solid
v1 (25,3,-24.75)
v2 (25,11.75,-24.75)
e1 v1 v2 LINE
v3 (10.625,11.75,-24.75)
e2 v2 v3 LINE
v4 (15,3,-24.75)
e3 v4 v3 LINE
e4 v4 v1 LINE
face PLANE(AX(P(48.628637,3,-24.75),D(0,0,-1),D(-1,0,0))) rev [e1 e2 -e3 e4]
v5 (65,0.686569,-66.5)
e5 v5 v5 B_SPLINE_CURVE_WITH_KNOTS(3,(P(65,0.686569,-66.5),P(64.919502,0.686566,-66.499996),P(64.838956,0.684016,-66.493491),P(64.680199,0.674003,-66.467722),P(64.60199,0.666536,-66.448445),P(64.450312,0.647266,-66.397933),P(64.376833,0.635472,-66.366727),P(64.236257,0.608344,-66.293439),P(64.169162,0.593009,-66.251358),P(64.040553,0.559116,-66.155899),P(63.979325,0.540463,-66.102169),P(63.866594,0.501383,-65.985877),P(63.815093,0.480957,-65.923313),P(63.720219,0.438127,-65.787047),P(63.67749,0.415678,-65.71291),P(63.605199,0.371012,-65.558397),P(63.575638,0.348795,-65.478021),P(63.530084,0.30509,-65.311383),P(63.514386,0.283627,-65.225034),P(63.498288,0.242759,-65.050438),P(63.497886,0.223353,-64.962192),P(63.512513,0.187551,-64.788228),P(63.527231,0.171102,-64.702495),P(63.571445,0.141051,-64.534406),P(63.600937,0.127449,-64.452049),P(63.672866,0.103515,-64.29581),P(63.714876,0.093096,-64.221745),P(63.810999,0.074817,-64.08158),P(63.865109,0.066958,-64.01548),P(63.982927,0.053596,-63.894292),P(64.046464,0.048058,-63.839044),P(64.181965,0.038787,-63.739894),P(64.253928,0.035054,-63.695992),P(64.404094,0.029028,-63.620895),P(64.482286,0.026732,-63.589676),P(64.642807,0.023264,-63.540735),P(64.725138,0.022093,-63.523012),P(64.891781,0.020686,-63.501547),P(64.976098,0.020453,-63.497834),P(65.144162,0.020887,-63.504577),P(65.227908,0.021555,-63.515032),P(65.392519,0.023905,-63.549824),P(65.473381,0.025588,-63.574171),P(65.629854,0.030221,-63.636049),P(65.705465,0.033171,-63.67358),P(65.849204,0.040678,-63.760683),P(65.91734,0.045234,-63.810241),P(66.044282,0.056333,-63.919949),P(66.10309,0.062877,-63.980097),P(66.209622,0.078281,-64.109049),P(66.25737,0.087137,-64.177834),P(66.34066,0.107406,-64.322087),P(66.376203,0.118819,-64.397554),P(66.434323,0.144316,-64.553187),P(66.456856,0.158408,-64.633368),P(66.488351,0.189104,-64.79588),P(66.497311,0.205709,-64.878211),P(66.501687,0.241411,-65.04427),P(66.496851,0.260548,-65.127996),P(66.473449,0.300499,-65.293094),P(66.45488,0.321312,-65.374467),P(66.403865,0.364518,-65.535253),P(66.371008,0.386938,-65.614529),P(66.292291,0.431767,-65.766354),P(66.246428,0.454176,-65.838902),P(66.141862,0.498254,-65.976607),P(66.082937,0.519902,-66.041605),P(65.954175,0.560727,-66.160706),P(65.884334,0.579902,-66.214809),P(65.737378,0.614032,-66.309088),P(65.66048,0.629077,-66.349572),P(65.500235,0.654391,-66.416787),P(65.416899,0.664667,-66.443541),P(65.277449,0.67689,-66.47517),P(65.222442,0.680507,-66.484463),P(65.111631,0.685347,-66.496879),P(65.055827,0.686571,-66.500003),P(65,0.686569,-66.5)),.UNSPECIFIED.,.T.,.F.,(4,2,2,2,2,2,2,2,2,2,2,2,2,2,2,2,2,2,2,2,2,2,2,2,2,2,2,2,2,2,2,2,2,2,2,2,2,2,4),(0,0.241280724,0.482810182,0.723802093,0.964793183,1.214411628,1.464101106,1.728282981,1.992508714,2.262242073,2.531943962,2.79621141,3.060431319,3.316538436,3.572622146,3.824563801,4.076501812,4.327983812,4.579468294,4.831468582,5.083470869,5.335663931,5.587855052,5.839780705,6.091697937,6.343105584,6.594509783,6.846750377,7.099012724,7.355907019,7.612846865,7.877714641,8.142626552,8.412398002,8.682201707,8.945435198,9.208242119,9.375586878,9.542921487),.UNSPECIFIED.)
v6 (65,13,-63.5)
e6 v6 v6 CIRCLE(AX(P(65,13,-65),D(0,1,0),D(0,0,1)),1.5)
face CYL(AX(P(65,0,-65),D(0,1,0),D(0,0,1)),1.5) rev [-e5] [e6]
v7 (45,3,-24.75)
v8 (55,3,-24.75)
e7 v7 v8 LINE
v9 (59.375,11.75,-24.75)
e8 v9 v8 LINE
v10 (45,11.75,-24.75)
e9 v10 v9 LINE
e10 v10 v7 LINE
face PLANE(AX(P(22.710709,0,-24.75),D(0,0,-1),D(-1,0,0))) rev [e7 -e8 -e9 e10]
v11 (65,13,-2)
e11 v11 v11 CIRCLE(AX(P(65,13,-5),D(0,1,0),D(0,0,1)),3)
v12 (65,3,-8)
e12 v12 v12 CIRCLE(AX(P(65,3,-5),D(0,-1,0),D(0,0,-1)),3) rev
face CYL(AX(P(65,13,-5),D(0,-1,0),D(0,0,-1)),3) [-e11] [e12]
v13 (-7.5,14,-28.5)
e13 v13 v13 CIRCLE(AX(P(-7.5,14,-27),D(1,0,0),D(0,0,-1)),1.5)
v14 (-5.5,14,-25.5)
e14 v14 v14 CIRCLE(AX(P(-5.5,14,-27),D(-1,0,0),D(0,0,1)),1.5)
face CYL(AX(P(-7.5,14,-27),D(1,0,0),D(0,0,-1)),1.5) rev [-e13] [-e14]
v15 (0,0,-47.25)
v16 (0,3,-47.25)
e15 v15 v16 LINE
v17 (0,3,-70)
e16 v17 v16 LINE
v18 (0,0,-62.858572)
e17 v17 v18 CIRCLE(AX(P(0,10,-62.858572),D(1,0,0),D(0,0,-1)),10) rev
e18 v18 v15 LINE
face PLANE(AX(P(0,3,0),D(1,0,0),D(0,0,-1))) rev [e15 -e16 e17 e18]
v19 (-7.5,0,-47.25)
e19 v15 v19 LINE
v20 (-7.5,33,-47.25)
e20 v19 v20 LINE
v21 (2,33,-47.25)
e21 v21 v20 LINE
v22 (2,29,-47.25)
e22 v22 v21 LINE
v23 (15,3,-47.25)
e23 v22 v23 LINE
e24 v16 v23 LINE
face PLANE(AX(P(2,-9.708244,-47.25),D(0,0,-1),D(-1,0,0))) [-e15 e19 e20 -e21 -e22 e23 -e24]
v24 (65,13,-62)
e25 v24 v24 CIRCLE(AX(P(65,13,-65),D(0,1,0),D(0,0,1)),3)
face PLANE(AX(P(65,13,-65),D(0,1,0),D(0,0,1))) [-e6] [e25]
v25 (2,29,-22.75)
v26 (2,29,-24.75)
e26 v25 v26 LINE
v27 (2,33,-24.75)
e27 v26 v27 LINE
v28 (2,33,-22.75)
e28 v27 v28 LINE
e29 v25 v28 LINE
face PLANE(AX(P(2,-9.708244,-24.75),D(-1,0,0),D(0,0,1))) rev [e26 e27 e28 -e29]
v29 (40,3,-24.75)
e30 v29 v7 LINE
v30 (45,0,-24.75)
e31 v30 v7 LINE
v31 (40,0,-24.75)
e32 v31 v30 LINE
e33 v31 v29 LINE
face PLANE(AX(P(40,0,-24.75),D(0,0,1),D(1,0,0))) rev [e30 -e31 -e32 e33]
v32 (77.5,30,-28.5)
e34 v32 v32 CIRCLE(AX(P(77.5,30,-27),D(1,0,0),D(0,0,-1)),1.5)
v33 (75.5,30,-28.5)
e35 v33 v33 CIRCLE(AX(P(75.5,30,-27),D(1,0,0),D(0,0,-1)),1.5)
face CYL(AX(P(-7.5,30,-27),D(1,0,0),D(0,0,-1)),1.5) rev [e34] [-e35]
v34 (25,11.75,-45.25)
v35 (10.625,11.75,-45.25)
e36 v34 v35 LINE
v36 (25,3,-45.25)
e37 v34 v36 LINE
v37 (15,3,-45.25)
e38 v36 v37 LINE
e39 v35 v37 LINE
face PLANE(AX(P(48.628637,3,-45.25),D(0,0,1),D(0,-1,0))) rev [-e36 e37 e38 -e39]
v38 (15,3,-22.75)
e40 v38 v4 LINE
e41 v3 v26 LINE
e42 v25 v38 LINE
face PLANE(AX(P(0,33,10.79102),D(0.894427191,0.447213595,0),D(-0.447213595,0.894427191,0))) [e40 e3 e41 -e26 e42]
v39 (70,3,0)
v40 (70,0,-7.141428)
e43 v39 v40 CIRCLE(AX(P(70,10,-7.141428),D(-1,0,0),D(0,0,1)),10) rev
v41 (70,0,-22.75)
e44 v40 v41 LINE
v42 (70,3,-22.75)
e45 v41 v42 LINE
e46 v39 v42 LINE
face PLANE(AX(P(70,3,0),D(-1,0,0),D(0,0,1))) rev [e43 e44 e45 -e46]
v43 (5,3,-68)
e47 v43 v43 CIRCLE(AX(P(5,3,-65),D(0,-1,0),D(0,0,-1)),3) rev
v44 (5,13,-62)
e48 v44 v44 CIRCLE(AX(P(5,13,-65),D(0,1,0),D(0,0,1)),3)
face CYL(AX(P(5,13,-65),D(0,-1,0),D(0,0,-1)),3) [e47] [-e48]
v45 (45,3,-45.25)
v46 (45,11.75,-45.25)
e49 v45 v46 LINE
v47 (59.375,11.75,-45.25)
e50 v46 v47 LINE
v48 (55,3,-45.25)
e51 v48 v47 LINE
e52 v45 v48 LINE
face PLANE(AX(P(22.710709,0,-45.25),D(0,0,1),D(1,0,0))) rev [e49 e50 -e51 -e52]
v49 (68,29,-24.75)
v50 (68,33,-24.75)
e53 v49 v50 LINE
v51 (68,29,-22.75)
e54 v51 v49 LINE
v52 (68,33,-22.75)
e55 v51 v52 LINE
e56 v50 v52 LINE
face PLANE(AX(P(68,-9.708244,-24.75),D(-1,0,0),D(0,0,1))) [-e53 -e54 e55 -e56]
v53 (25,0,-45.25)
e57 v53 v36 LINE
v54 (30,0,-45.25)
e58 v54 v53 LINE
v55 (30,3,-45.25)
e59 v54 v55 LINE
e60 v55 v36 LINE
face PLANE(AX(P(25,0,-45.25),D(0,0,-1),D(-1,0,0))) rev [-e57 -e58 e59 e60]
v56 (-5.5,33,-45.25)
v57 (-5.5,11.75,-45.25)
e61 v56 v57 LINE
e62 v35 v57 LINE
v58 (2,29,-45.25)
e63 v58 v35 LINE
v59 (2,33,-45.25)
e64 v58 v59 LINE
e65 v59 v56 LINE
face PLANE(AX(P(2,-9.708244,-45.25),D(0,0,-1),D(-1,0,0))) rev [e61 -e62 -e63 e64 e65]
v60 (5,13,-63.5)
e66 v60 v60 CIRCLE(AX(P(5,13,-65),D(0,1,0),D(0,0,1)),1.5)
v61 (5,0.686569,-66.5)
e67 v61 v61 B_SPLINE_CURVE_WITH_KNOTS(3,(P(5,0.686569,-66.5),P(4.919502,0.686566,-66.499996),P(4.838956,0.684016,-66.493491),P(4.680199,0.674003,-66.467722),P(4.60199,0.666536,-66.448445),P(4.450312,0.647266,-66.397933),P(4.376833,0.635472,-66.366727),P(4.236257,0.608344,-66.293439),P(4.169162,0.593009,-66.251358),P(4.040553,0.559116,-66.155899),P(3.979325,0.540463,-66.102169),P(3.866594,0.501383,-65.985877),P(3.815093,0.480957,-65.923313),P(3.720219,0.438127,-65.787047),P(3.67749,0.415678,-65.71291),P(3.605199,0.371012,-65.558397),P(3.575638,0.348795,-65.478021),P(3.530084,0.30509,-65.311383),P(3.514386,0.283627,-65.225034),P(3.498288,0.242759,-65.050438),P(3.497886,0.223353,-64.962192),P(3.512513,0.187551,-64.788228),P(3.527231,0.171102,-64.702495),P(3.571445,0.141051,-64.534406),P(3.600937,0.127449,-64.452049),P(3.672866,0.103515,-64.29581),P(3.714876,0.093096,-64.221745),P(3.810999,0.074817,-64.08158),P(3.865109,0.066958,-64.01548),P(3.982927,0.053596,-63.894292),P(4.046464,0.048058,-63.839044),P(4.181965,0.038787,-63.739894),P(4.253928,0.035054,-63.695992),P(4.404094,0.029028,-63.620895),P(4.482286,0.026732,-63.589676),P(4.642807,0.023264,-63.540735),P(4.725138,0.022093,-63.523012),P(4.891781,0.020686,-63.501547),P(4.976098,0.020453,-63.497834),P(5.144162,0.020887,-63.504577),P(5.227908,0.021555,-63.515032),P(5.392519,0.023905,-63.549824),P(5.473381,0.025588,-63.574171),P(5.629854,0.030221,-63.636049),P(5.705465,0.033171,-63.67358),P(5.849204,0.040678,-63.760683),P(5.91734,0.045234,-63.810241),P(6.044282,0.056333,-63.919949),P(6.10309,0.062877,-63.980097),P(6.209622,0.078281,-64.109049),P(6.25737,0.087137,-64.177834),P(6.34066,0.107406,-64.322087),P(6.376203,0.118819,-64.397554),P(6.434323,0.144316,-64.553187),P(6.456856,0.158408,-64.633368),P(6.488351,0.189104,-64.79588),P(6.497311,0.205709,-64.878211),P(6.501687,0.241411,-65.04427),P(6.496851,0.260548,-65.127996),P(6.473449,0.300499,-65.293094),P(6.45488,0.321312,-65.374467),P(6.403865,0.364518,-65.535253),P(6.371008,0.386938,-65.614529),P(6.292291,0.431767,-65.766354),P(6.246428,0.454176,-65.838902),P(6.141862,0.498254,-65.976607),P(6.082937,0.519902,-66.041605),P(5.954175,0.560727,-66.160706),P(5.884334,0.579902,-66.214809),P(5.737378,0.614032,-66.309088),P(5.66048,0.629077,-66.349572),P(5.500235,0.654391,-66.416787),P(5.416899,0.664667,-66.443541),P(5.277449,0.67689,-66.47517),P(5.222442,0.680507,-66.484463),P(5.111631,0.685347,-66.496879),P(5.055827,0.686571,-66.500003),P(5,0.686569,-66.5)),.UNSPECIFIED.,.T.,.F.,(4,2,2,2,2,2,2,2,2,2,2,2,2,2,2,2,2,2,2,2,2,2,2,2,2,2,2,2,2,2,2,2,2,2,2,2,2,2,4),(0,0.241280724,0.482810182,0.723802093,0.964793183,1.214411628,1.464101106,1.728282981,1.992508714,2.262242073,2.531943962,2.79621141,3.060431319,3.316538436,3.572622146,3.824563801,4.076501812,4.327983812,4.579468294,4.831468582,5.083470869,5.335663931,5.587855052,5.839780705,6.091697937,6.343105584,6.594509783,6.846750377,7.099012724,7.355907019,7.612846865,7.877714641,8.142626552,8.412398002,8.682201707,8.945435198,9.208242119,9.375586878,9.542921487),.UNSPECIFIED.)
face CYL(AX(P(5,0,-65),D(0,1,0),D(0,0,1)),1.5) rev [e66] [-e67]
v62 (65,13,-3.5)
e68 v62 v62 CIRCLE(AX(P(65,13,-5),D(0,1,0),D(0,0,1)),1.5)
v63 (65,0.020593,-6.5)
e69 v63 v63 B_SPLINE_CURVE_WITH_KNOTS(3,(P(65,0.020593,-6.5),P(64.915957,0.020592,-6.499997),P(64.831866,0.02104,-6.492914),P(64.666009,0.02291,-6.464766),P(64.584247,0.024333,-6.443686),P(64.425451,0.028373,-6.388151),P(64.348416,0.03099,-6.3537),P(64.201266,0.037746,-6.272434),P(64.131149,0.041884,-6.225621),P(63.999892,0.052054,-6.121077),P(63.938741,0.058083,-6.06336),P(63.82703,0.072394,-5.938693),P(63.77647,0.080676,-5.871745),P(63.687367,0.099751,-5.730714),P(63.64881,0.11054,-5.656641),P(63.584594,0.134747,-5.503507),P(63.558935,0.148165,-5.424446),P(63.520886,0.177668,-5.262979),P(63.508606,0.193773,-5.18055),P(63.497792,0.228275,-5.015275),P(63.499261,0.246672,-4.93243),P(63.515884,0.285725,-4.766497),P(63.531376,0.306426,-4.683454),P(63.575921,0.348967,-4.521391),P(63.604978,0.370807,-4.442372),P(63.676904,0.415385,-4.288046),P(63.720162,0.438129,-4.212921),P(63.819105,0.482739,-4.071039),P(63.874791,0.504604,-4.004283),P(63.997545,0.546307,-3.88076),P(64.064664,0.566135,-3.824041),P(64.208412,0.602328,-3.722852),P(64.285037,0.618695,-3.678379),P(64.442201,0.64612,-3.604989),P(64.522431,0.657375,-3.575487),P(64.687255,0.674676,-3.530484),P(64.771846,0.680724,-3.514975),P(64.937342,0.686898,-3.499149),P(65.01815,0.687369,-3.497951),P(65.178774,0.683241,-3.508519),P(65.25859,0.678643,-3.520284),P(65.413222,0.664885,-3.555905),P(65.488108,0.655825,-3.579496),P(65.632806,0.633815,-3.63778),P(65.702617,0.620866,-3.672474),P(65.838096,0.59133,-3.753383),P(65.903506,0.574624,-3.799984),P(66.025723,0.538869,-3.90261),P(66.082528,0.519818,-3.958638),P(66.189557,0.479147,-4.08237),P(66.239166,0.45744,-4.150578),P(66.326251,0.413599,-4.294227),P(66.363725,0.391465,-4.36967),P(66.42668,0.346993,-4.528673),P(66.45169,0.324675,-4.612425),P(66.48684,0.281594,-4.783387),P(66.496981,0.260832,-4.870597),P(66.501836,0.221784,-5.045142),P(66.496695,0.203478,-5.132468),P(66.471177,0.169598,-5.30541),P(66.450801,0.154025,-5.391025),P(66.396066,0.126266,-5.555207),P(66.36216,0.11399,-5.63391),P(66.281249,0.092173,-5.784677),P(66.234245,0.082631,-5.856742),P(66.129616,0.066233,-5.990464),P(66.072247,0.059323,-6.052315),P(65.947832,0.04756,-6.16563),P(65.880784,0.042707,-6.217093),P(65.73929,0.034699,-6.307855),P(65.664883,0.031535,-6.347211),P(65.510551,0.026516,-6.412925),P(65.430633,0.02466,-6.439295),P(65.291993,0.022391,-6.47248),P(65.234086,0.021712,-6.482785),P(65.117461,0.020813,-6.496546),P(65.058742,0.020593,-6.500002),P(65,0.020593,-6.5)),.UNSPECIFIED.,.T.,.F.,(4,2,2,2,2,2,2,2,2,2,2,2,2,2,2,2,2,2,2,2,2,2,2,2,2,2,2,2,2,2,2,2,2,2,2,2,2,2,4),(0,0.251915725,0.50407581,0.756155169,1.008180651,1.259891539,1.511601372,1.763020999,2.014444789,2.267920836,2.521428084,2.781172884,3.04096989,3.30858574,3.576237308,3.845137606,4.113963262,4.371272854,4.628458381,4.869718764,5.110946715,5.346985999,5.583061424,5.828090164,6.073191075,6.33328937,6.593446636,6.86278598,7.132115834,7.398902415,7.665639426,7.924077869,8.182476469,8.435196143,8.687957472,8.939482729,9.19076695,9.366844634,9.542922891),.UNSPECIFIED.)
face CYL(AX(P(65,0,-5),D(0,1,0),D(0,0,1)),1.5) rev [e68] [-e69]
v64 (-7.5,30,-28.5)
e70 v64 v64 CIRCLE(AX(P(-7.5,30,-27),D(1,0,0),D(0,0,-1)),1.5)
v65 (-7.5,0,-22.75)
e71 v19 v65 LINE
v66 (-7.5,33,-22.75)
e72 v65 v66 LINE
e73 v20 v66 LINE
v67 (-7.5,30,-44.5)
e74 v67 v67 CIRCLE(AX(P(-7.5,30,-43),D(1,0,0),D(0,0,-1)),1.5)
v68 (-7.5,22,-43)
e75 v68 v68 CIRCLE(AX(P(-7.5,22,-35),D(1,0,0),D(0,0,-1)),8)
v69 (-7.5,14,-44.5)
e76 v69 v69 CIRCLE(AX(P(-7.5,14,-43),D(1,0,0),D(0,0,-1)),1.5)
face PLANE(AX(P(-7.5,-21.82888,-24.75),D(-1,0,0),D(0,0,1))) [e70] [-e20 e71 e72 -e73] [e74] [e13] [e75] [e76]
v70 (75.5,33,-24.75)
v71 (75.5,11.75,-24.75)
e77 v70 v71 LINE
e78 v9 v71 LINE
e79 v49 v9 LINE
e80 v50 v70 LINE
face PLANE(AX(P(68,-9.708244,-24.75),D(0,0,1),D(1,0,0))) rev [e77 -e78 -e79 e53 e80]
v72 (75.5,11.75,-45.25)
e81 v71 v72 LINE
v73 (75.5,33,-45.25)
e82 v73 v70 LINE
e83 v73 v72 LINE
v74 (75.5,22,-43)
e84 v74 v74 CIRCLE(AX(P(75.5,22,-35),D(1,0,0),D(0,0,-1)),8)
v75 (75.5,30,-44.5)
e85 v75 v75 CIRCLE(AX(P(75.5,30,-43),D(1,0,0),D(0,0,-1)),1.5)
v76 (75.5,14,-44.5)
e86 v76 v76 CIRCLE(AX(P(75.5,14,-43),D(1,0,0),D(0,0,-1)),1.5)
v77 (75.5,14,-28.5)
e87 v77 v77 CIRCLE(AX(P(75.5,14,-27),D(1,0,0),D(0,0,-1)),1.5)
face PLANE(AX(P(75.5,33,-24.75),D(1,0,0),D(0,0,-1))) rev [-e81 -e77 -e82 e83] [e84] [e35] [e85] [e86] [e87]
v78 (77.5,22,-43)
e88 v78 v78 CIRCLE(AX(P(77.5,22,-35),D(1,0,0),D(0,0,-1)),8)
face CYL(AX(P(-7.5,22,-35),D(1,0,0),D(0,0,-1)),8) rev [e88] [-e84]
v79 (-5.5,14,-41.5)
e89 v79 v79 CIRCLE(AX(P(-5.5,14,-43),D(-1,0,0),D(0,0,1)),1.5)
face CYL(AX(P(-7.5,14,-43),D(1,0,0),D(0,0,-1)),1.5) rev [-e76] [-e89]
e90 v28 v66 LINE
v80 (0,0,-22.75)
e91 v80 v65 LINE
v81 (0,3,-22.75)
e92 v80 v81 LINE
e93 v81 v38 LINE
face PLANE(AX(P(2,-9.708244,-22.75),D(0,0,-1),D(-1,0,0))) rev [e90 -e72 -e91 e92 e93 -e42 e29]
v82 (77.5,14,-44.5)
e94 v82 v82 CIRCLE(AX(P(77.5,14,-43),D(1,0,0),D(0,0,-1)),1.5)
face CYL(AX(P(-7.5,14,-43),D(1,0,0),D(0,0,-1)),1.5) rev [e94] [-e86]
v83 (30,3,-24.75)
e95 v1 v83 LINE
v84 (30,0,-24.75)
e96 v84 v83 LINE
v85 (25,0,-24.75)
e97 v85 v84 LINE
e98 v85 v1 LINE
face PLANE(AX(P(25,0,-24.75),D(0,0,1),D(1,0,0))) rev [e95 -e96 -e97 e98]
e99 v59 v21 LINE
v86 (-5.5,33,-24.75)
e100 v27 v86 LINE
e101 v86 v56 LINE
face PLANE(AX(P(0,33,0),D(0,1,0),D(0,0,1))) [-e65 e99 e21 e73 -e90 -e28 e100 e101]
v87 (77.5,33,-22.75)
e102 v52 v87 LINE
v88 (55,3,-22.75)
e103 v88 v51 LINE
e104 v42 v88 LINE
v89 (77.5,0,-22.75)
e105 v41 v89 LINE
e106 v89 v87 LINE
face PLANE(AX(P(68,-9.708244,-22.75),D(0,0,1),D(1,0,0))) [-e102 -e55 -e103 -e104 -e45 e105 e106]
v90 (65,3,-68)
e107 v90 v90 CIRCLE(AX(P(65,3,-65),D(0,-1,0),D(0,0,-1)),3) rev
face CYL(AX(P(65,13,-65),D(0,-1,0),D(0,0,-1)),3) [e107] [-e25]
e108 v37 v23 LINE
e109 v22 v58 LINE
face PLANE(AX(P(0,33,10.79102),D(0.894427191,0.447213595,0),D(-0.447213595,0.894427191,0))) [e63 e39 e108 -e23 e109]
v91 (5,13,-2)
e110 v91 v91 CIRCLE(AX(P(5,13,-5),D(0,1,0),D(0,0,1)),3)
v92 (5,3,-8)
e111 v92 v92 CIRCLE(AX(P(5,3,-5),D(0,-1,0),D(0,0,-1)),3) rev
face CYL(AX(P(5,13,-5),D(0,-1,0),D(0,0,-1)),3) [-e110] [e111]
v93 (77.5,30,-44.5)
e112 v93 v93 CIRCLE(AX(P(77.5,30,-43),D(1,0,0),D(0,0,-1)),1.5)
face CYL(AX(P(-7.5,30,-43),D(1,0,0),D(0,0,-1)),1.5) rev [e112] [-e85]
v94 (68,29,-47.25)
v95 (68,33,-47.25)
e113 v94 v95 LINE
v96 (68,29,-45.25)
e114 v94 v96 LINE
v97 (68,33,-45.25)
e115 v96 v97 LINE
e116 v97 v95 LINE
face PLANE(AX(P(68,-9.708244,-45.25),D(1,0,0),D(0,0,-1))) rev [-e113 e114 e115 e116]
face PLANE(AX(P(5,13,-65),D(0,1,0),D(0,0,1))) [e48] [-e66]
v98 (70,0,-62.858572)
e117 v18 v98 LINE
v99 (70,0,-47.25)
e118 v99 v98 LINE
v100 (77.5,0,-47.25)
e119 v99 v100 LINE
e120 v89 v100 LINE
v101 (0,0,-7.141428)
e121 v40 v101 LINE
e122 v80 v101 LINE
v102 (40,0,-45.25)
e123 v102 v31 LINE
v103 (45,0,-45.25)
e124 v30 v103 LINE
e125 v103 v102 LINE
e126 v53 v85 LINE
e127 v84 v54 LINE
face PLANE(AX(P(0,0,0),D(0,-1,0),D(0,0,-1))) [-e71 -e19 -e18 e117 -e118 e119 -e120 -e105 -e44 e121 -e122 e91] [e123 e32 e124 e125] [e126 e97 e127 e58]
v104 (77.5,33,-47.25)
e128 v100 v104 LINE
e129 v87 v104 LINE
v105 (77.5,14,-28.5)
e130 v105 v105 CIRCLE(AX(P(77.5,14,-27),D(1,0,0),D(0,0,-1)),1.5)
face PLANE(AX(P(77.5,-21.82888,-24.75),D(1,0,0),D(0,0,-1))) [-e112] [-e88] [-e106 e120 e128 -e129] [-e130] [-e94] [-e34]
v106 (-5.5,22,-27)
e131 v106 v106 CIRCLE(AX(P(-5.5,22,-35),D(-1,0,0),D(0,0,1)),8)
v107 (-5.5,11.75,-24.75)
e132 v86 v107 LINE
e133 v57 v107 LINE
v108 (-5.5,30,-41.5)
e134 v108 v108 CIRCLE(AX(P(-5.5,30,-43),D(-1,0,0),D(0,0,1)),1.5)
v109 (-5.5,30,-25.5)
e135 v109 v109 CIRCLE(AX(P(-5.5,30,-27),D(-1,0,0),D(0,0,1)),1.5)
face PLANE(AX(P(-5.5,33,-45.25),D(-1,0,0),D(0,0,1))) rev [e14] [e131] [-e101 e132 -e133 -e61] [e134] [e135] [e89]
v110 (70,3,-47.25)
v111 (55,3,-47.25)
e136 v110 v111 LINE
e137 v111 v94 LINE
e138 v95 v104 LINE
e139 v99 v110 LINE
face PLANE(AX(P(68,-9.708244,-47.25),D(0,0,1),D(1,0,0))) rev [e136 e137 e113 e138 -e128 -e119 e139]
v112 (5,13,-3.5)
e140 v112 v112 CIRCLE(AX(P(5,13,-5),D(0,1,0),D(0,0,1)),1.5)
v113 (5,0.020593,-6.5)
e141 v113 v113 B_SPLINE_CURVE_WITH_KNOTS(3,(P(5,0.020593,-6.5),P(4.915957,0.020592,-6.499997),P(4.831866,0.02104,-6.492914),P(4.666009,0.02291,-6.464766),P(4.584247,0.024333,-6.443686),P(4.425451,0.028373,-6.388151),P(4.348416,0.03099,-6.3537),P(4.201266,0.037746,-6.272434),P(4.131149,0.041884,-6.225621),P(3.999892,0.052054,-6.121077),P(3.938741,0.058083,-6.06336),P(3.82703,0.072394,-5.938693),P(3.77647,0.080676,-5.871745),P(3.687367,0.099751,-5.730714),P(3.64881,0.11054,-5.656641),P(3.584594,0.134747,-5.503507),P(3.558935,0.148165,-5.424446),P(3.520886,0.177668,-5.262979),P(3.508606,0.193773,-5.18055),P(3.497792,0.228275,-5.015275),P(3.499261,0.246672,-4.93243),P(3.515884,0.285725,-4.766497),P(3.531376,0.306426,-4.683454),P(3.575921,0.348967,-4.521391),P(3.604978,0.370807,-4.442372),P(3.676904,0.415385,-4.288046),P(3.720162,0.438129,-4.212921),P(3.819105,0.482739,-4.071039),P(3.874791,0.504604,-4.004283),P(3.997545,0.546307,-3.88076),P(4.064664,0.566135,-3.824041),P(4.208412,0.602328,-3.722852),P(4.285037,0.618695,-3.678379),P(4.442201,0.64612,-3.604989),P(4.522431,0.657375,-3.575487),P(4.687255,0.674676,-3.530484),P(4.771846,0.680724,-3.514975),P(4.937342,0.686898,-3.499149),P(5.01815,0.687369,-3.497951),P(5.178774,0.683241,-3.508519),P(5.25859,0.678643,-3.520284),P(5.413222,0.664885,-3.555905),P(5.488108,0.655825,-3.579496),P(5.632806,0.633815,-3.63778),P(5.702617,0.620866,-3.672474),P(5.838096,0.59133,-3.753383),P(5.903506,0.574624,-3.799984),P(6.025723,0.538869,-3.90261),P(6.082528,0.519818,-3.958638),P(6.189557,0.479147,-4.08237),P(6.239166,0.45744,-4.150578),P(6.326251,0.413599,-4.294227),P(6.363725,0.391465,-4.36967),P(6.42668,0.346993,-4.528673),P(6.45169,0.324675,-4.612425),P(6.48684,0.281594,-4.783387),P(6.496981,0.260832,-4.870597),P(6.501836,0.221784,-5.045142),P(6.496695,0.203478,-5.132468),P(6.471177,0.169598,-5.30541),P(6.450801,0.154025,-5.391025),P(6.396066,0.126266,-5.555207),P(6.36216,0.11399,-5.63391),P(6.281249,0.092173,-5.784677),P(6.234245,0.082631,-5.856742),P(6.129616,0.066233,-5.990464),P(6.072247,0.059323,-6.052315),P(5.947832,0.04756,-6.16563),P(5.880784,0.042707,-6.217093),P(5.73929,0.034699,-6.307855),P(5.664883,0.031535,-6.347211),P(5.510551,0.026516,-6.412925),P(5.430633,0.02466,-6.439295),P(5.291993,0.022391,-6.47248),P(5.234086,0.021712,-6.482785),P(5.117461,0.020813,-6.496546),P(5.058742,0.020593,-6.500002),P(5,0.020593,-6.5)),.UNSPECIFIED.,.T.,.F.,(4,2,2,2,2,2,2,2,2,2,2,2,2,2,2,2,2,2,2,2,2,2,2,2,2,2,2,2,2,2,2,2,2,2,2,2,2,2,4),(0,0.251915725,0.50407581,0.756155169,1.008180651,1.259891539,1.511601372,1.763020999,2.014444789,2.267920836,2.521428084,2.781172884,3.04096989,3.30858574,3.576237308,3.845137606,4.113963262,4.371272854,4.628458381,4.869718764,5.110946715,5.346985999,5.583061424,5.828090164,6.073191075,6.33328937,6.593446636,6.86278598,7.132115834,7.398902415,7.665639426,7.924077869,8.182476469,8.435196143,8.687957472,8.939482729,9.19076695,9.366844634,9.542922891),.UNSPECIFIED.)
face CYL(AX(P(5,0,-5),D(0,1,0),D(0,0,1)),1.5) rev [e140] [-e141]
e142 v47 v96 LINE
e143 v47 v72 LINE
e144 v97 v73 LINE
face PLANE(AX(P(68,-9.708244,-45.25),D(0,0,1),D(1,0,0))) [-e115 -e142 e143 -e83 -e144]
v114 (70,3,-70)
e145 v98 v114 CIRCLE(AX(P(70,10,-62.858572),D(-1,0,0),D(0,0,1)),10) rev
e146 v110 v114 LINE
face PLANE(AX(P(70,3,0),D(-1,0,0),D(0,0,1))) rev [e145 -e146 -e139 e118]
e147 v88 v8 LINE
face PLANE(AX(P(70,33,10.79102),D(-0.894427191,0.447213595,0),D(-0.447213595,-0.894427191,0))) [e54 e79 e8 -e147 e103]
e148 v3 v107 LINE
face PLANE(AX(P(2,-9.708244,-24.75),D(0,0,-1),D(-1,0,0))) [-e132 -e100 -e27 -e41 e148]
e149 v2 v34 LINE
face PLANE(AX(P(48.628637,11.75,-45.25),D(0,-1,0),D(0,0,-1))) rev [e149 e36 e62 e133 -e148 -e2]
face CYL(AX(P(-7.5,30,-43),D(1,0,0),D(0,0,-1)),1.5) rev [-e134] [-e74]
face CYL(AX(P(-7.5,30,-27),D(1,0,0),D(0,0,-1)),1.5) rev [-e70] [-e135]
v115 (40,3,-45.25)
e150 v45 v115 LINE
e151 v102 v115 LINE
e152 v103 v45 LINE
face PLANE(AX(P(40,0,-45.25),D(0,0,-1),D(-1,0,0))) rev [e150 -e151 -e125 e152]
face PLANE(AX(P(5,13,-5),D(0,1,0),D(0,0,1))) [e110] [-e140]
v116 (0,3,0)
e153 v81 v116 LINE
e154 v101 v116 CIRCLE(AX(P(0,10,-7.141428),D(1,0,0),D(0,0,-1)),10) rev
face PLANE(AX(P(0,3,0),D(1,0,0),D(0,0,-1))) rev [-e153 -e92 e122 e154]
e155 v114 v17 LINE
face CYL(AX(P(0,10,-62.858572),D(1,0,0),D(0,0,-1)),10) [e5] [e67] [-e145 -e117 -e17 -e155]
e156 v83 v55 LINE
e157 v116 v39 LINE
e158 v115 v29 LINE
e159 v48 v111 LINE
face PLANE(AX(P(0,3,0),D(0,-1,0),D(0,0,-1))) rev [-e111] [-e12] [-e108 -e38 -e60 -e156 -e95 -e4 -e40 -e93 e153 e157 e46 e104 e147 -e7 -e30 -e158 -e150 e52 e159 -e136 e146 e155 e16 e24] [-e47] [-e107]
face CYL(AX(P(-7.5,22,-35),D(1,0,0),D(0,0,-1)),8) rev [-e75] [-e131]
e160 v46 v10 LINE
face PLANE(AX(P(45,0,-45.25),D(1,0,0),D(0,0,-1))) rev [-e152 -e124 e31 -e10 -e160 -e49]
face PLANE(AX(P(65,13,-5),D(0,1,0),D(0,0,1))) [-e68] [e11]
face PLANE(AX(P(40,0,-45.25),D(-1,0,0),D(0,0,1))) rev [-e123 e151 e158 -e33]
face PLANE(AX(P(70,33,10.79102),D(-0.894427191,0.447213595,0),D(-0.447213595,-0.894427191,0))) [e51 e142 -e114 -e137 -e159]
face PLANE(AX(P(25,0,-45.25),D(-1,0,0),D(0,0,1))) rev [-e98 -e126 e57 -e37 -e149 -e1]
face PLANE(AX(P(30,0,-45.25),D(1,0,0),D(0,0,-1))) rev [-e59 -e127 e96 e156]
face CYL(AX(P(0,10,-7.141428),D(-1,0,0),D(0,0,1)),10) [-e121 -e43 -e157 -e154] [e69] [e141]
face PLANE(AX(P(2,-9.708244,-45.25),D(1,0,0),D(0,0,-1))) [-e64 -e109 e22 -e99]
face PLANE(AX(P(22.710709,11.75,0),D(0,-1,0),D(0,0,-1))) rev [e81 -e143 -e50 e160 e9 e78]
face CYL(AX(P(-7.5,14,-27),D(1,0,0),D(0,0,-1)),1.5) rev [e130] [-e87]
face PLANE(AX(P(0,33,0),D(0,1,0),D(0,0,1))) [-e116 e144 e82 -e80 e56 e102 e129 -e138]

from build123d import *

# Parameters (mm, degrees)
SKETCH1_W                       = 70
SKETCH1_H                       = 70
BOSS_EXTRUDE1_DEPTH             = 3
SKETCH2_W                       = 7.5
SKETCH2_H                       = 20.5
BOSS_EXTRUDE2_DEPTH             = 3
SKETCH3_W                       = 2
SKETCH3_H                       = 20.5
BOSS_EXTRUDE3_DEPTH             = 30
CUT_EXTRUDE1_DEPTH              = 114.481275989
CUT_EXTRUDE1_DEPTH_BACK         = 114.481275989
SKETCH4_R                       = 8
SKETCH4_R_2                     = 1.5
BOSS_EXTRUDE4_REACH             = 110.657
SKETCH5_W                       = 9.5
SKETCH5_H                       = 2
BOSS_EXTRUDE4_DIRECTION_2_REACH = 110.657
BOSS_EXTRUDE5_REACH             = 98.581
SKETCH7_W                       = 81
SKETCH7_H                       = 20.5
CUT_EXTRUDE2_DEPTH              = 109.656569061
SKETCH8_W                       = 5
SKETCH8_H                       = 20.5
CUT_EXTRUDE3_DEPTH              = 109.656569061
BOSS_EXTRUDE7_REACH             = 115.481
SKETCH17_W                      = 20.5
SKETCH17_H                      = 8.75
BOSS_EXTRUDE8_DEPTH             = 30.5
SKETCH19_R                      = 3
BOSS_EXTRUDE9_DEPTH             = 10
SKETCH20_R                      = 1.5
CUT_EXTRUDE4_DEPTH              = 107.330851591
FILLET1_DEPTH                   = 70


with BuildPart() as part:
    # Sketch1 → Boss-Extrude1 (new body)
    with BuildSketch(Plane(origin=(0, 0, 0), x_dir=(1, 0, 0), z_dir=(0, 1, 0))):
        with Locations((35, 35)):
            Rectangle(SKETCH1_W, SKETCH1_H)
    extrude(amount=BOSS_EXTRUDE1_DEPTH)

    # Sketch2 → Boss-Extrude2 (add)
    with BuildSketch(Plane(origin=(0, 3, 0), x_dir=(1, 0, 0), z_dir=(0, 1, 0))):
        with Locations((-3.75, 35)):
            Rectangle(SKETCH2_W, SKETCH2_H)
        with Locations((73.75, 35)):
            Rectangle(SKETCH2_W, SKETCH2_H)
    extrude(amount=-BOSS_EXTRUDE2_DEPTH)

    # Sketch3 → Boss-Extrude3 (add)
    with BuildSketch(Plane(origin=(0, 3, 0), x_dir=(1, 0, 0), z_dir=(0, 1, 0))):
        with Locations((-6.5, 35)):
            Rectangle(SKETCH3_W, SKETCH3_H)
        with Locations((76.5, 35)):
            Rectangle(SKETCH3_W, SKETCH3_H)
    extrude(amount=BOSS_EXTRUDE3_DEPTH)

    # Sketch4 → Cut-Extrude1 (cut, two sides: drawn at the far end of the back side and taken through both)
    with BuildSketch(Plane(origin=(-5.5, 0, 0), x_dir=(0, 0, -1), z_dir=(1, 0, 0)).offset(-CUT_EXTRUDE1_DEPTH_BACK)):
        with Locations((35, 22)):
            Circle(SKETCH4_R)
        with Locations((43, 30)):
            Circle(SKETCH4_R_2)
        with Locations((43, 14)):
            Circle(SKETCH4_R_2)
        with Locations((27, 30)):
            Circle(SKETCH4_R_2)
        with Locations((27, 14)):
            Circle(SKETCH4_R_2)
    extrude(amount=CUT_EXTRUDE1_DEPTH + CUT_EXTRUDE1_DEPTH_BACK, mode=Mode.SUBTRACT)

    # Boss-Extrude4: up to this face of the body (flat: up to its plane)
    boss_extrude4_end = Plane(part.part.faces().sort_by_distance((35, 0, -35))[0])
    # Sketch5 → Boss-Extrude4 (add, up to the picked face)
    with BuildSketch(Plane(origin=(0, 3, 0), x_dir=(1, 0, 0), z_dir=(0, 1, 0)), mode=Mode.PRIVATE) as boss_extrude4_sk1:
        with Locations((-2.75, 23.75)):
            Rectangle(SKETCH5_W, SKETCH5_H)
    boss_extrude4_tool1 = split(extrude(boss_extrude4_sk1.sketch, amount=-BOSS_EXTRUDE4_REACH, mode=Mode.PRIVATE), bisect_by=boss_extrude4_end, keep=Keep.BOTH, mode=Mode.PRIVATE)
    # Sketch5 → Boss-Extrude4 (add, up to the picked face)
    with BuildSketch(Plane(origin=(0, 3, 0), x_dir=(1, 0, 0), z_dir=(0, 1, 0)), mode=Mode.PRIVATE) as boss_extrude4_sk2:
        with Locations((-2.75, 46.25)):
            Rectangle(SKETCH5_W, SKETCH5_H)
    boss_extrude4_tool2 = split(extrude(boss_extrude4_sk2.sketch, amount=-BOSS_EXTRUDE4_REACH, mode=Mode.PRIVATE), bisect_by=boss_extrude4_end, keep=Keep.BOTH, mode=Mode.PRIVATE)
    # Sketch5 → Boss-Extrude4 (add, up to the picked face)
    with BuildSketch(Plane(origin=(0, 3, 0), x_dir=(1, 0, 0), z_dir=(0, 1, 0)), mode=Mode.PRIVATE) as boss_extrude4_sk3:
        with Locations((72.75, 23.75)):
            Rectangle(SKETCH5_W, SKETCH5_H)
    boss_extrude4_tool3 = split(extrude(boss_extrude4_sk3.sketch, amount=-BOSS_EXTRUDE4_REACH, mode=Mode.PRIVATE), bisect_by=boss_extrude4_end, keep=Keep.BOTH, mode=Mode.PRIVATE)
    # Sketch5 → Boss-Extrude4 (add, up to the picked face)
    with BuildSketch(Plane(origin=(0, 3, 0), x_dir=(1, 0, 0), z_dir=(0, 1, 0)), mode=Mode.PRIVATE) as boss_extrude4_sk4:
        with Locations((72.75, 46.25)):
            Rectangle(SKETCH5_W, SKETCH5_H)
    boss_extrude4_tool4 = split(extrude(boss_extrude4_sk4.sketch, amount=-BOSS_EXTRUDE4_REACH, mode=Mode.PRIVATE), bisect_by=boss_extrude4_end, keep=Keep.BOTH, mode=Mode.PRIVATE)
    add(boss_extrude4_tool1.solids().sort_by(Axis((-2.75, 3, -23.75), (0, -1, 0)))[0])
    add(boss_extrude4_tool2.solids().sort_by(Axis((-2.75, 3, -46.25), (0, -1, 0)))[0])
    add(boss_extrude4_tool3.solids().sort_by(Axis((72.75, 3, -23.75), (0, -1, 0)))[0])
    add(boss_extrude4_tool4.solids().sort_by(Axis((72.75, 3, -46.25), (0, -1, 0)))[0])

    # Boss-Extrude4 direction 2: up to this face of the body (flat: up to its plane)
    boss_extrude4_direction_2_end = Plane(part.part.faces().sort_by_distance((76.5, 33, -35))[0])
    # Sketch5 → Boss-Extrude4 direction 2 (add, up to the picked face)
    with BuildSketch(Plane(origin=(0, 3, 0), x_dir=(1, 0, 0), z_dir=(0, 1, 0)), mode=Mode.PRIVATE) as boss_extrude4_direction_2_sk1:
        with Locations((-2.75, 23.75)):
            Rectangle(SKETCH5_W, SKETCH5_H)
    boss_extrude4_direction_2_tool1 = split(extrude(boss_extrude4_direction_2_sk1.sketch, amount=BOSS_EXTRUDE4_DIRECTION_2_REACH, mode=Mode.PRIVATE), bisect_by=boss_extrude4_direction_2_end, keep=Keep.BOTH, mode=Mode.PRIVATE)
    # Sketch5 → Boss-Extrude4 direction 2 (add, up to the picked face)
    with BuildSketch(Plane(origin=(0, 3, 0), x_dir=(1, 0, 0), z_dir=(0, 1, 0)), mode=Mode.PRIVATE) as boss_extrude4_direction_2_sk2:
        with Locations((-2.75, 46.25)):
            Rectangle(SKETCH5_W, SKETCH5_H)
    boss_extrude4_direction_2_tool2 = split(extrude(boss_extrude4_direction_2_sk2.sketch, amount=BOSS_EXTRUDE4_DIRECTION_2_REACH, mode=Mode.PRIVATE), bisect_by=boss_extrude4_direction_2_end, keep=Keep.BOTH, mode=Mode.PRIVATE)
    # Sketch5 → Boss-Extrude4 direction 2 (add, up to the picked face)
    with BuildSketch(Plane(origin=(0, 3, 0), x_dir=(1, 0, 0), z_dir=(0, 1, 0)), mode=Mode.PRIVATE) as boss_extrude4_direction_2_sk3:
        with Locations((72.75, 23.75)):
            Rectangle(SKETCH5_W, SKETCH5_H)
    boss_extrude4_direction_2_tool3 = split(extrude(boss_extrude4_direction_2_sk3.sketch, amount=BOSS_EXTRUDE4_DIRECTION_2_REACH, mode=Mode.PRIVATE), bisect_by=boss_extrude4_direction_2_end, keep=Keep.BOTH, mode=Mode.PRIVATE)
    # Sketch5 → Boss-Extrude4 direction 2 (add, up to the picked face)
    with BuildSketch(Plane(origin=(0, 3, 0), x_dir=(1, 0, 0), z_dir=(0, 1, 0)), mode=Mode.PRIVATE) as boss_extrude4_direction_2_sk4:
        with Locations((72.75, 46.25)):
            Rectangle(SKETCH5_W, SKETCH5_H)
    boss_extrude4_direction_2_tool4 = split(extrude(boss_extrude4_direction_2_sk4.sketch, amount=BOSS_EXTRUDE4_DIRECTION_2_REACH, mode=Mode.PRIVATE), bisect_by=boss_extrude4_direction_2_end, keep=Keep.BOTH, mode=Mode.PRIVATE)
    add(boss_extrude4_direction_2_tool1.solids().sort_by(Axis((-2.75, 3, -23.75), (0, 1, 0)))[0])
    add(boss_extrude4_direction_2_tool2.solids().sort_by(Axis((-2.75, 3, -46.25), (0, 1, 0)))[0])
    add(boss_extrude4_direction_2_tool3.solids().sort_by(Axis((72.75, 3, -23.75), (0, 1, 0)))[0])
    add(boss_extrude4_direction_2_tool4.solids().sort_by(Axis((72.75, 3, -46.25), (0, 1, 0)))[0])

    # Boss-Extrude5: up to this face of the body (flat: up to its plane)
    boss_extrude5_end = Plane(part.part.faces().sort_by_distance((72.823170732, 16.792682927, -22.75))[0])
    # Sketch6 → Boss-Extrude5 (add, up to the picked face)
    with BuildSketch(Plane(origin=(0, 0, -47.25), x_dir=(-1, 0, 0), z_dir=(0, 0, -1)), mode=Mode.PRIVATE) as boss_extrude5_sk1:
        Polygon((-70, 33), (-55, 3), (-70, 3), align=None)
    boss_extrude5_tool1 = split(extrude(boss_extrude5_sk1.sketch, amount=-BOSS_EXTRUDE5_REACH, mode=Mode.PRIVATE), bisect_by=boss_extrude5_end, keep=Keep.BOTH, mode=Mode.PRIVATE)
    # Sketch6 → Boss-Extrude5 (add, up to the picked face)
    with BuildSketch(Plane(origin=(0, 0, -47.25), x_dir=(-1, 0, 0), z_dir=(0, 0, -1)), mode=Mode.PRIVATE) as boss_extrude5_sk2:
        Polygon((0, 33), (-15, 3), (0, 3), align=None)
    boss_extrude5_tool2 = split(extrude(boss_extrude5_sk2.sketch, amount=-BOSS_EXTRUDE5_REACH, mode=Mode.PRIVATE), bisect_by=boss_extrude5_end, keep=Keep.BOTH, mode=Mode.PRIVATE)
    add(boss_extrude5_tool1.solids().sort_by(Axis((65, 13, -47.25), (0, 0, 1)))[0])
    add(boss_extrude5_tool2.solids().sort_by(Axis((5, 13, -47.25), (0, 0, 1)))[0])

    # Sketch7 → Cut-Extrude2 (cut, through all)
    with BuildSketch(Plane(origin=(0, 3, 0), x_dir=(1, 0, 0), z_dir=(0, 1, 0))):
        with Locations((35, 35)):
            Rectangle(SKETCH7_W, SKETCH7_H)
    extrude(amount=CUT_EXTRUDE2_DEPTH, mode=Mode.SUBTRACT)

    # Sketch8 → Cut-Extrude3 (cut, through all)
    with BuildSketch(Plane(origin=(0, 3, 0), x_dir=(1, 0, 0), z_dir=(0, 1, 0))):
        with Locations((27.5, 35)):
            Rectangle(SKETCH8_W, SKETCH8_H)
        with Locations((42.5, 35)):
            Rectangle(SKETCH8_W, SKETCH8_H)
    extrude(amount=-CUT_EXTRUDE3_DEPTH, mode=Mode.SUBTRACT)

    # Boss-Extrude7: up to this face of the body (flat: up to its plane)
    boss_extrude7_end = Plane(part.part.faces().sort_by_distance((45, 1.5, -35))[0])
    # Sketch17 → Boss-Extrude7 (add, up to the picked face)
    with BuildSketch(Plane.ZY.offset(-75.5), mode=Mode.PRIVATE) as boss_extrude7_sk1:
        with Locations((-35, 7.375)):
            Rectangle(SKETCH17_W, SKETCH17_H)
    boss_extrude7_tool1 = split(extrude(boss_extrude7_sk1.sketch, amount=BOSS_EXTRUDE7_REACH, mode=Mode.PRIVATE), bisect_by=boss_extrude7_end, keep=Keep.BOTH, mode=Mode.PRIVATE)
    add(boss_extrude7_tool1.solids().sort_by(Axis((75.5, 7.375, -35), (-1, 0, 0)))[0])

    # Sketch18 → Boss-Extrude8 (add)
    with BuildSketch(Plane(origin=(-5.5, 0, 0), x_dir=(0, 0, -1), z_dir=(1, 0, 0))):
        Polygon((24.75, 3), (24.75, 0), (45.25, 0), (45.25, 3), (45.25, 11.75), (24.75, 11.75), align=None)
    extrude(amount=BOSS_EXTRUDE8_DEPTH)

    # Sketch19 → Boss-Extrude9 (add)
    with BuildSketch(Plane(origin=(0, 3, 0), x_dir=(1, 0, 0), z_dir=(0, 1, 0))):
        with Locations(Location((5, 5, 0), (0, 0, 90))):
            Circle(SKETCH19_R)
        with Locations(Location((65, 5, 0), (0, 0, 90))):
            Circle(SKETCH19_R)
        with Locations(Location((65, 65, 0), (0, 0, 90))):
            Circle(SKETCH19_R)
        with Locations(Location((5, 65, 0), (0, 0, 90))):
            Circle(SKETCH19_R)
    extrude(amount=BOSS_EXTRUDE9_DEPTH)

    # Sketch20 → Cut-Extrude4 (cut, through all)
    with BuildSketch(Plane(origin=(0, 13, 0), x_dir=(1, 0, 0), z_dir=(0, 1, 0))):
        with Locations(Location((5, 65, 0), (0, 0, 270))):
            Circle(SKETCH20_R)
        with Locations(Location((65, 65, 0), (0, 0, 270))):
            Circle(SKETCH20_R)
        with Locations(Location((65, 5, 0), (0, 0, 270))):
            Circle(SKETCH20_R)
        with Locations(Location((5, 5, 0), (0, 0, 270))):
            Circle(SKETCH20_R)
    extrude(amount=-CUT_EXTRUDE4_DEPTH, mode=Mode.SUBTRACT)

    # Fillet1: read off the stored shape, not the designer's step
    # Fillet1 outline → Fillet1 (cut)
    with BuildSketch(Plane.YZ):
        with BuildLine():
            Line((0, 0), (0, -7.141428429))
            ThreePointArc((0, -7.141428429), (0.780455543, -3.268445083), (3, 0))
            Line((3, 0), (0, 0))
        make_face()
        with BuildLine():
            ThreePointArc((3, -70), (0.780455543, -66.731554917), (0, -62.858571571))
            Line((0, -62.858571571), (0, -70))
            Line((0, -70), (3, -70))
        make_face()
    extrude(amount=FILLET1_DEPTH, mode=Mode.SUBTRACT)


solid = part.part
